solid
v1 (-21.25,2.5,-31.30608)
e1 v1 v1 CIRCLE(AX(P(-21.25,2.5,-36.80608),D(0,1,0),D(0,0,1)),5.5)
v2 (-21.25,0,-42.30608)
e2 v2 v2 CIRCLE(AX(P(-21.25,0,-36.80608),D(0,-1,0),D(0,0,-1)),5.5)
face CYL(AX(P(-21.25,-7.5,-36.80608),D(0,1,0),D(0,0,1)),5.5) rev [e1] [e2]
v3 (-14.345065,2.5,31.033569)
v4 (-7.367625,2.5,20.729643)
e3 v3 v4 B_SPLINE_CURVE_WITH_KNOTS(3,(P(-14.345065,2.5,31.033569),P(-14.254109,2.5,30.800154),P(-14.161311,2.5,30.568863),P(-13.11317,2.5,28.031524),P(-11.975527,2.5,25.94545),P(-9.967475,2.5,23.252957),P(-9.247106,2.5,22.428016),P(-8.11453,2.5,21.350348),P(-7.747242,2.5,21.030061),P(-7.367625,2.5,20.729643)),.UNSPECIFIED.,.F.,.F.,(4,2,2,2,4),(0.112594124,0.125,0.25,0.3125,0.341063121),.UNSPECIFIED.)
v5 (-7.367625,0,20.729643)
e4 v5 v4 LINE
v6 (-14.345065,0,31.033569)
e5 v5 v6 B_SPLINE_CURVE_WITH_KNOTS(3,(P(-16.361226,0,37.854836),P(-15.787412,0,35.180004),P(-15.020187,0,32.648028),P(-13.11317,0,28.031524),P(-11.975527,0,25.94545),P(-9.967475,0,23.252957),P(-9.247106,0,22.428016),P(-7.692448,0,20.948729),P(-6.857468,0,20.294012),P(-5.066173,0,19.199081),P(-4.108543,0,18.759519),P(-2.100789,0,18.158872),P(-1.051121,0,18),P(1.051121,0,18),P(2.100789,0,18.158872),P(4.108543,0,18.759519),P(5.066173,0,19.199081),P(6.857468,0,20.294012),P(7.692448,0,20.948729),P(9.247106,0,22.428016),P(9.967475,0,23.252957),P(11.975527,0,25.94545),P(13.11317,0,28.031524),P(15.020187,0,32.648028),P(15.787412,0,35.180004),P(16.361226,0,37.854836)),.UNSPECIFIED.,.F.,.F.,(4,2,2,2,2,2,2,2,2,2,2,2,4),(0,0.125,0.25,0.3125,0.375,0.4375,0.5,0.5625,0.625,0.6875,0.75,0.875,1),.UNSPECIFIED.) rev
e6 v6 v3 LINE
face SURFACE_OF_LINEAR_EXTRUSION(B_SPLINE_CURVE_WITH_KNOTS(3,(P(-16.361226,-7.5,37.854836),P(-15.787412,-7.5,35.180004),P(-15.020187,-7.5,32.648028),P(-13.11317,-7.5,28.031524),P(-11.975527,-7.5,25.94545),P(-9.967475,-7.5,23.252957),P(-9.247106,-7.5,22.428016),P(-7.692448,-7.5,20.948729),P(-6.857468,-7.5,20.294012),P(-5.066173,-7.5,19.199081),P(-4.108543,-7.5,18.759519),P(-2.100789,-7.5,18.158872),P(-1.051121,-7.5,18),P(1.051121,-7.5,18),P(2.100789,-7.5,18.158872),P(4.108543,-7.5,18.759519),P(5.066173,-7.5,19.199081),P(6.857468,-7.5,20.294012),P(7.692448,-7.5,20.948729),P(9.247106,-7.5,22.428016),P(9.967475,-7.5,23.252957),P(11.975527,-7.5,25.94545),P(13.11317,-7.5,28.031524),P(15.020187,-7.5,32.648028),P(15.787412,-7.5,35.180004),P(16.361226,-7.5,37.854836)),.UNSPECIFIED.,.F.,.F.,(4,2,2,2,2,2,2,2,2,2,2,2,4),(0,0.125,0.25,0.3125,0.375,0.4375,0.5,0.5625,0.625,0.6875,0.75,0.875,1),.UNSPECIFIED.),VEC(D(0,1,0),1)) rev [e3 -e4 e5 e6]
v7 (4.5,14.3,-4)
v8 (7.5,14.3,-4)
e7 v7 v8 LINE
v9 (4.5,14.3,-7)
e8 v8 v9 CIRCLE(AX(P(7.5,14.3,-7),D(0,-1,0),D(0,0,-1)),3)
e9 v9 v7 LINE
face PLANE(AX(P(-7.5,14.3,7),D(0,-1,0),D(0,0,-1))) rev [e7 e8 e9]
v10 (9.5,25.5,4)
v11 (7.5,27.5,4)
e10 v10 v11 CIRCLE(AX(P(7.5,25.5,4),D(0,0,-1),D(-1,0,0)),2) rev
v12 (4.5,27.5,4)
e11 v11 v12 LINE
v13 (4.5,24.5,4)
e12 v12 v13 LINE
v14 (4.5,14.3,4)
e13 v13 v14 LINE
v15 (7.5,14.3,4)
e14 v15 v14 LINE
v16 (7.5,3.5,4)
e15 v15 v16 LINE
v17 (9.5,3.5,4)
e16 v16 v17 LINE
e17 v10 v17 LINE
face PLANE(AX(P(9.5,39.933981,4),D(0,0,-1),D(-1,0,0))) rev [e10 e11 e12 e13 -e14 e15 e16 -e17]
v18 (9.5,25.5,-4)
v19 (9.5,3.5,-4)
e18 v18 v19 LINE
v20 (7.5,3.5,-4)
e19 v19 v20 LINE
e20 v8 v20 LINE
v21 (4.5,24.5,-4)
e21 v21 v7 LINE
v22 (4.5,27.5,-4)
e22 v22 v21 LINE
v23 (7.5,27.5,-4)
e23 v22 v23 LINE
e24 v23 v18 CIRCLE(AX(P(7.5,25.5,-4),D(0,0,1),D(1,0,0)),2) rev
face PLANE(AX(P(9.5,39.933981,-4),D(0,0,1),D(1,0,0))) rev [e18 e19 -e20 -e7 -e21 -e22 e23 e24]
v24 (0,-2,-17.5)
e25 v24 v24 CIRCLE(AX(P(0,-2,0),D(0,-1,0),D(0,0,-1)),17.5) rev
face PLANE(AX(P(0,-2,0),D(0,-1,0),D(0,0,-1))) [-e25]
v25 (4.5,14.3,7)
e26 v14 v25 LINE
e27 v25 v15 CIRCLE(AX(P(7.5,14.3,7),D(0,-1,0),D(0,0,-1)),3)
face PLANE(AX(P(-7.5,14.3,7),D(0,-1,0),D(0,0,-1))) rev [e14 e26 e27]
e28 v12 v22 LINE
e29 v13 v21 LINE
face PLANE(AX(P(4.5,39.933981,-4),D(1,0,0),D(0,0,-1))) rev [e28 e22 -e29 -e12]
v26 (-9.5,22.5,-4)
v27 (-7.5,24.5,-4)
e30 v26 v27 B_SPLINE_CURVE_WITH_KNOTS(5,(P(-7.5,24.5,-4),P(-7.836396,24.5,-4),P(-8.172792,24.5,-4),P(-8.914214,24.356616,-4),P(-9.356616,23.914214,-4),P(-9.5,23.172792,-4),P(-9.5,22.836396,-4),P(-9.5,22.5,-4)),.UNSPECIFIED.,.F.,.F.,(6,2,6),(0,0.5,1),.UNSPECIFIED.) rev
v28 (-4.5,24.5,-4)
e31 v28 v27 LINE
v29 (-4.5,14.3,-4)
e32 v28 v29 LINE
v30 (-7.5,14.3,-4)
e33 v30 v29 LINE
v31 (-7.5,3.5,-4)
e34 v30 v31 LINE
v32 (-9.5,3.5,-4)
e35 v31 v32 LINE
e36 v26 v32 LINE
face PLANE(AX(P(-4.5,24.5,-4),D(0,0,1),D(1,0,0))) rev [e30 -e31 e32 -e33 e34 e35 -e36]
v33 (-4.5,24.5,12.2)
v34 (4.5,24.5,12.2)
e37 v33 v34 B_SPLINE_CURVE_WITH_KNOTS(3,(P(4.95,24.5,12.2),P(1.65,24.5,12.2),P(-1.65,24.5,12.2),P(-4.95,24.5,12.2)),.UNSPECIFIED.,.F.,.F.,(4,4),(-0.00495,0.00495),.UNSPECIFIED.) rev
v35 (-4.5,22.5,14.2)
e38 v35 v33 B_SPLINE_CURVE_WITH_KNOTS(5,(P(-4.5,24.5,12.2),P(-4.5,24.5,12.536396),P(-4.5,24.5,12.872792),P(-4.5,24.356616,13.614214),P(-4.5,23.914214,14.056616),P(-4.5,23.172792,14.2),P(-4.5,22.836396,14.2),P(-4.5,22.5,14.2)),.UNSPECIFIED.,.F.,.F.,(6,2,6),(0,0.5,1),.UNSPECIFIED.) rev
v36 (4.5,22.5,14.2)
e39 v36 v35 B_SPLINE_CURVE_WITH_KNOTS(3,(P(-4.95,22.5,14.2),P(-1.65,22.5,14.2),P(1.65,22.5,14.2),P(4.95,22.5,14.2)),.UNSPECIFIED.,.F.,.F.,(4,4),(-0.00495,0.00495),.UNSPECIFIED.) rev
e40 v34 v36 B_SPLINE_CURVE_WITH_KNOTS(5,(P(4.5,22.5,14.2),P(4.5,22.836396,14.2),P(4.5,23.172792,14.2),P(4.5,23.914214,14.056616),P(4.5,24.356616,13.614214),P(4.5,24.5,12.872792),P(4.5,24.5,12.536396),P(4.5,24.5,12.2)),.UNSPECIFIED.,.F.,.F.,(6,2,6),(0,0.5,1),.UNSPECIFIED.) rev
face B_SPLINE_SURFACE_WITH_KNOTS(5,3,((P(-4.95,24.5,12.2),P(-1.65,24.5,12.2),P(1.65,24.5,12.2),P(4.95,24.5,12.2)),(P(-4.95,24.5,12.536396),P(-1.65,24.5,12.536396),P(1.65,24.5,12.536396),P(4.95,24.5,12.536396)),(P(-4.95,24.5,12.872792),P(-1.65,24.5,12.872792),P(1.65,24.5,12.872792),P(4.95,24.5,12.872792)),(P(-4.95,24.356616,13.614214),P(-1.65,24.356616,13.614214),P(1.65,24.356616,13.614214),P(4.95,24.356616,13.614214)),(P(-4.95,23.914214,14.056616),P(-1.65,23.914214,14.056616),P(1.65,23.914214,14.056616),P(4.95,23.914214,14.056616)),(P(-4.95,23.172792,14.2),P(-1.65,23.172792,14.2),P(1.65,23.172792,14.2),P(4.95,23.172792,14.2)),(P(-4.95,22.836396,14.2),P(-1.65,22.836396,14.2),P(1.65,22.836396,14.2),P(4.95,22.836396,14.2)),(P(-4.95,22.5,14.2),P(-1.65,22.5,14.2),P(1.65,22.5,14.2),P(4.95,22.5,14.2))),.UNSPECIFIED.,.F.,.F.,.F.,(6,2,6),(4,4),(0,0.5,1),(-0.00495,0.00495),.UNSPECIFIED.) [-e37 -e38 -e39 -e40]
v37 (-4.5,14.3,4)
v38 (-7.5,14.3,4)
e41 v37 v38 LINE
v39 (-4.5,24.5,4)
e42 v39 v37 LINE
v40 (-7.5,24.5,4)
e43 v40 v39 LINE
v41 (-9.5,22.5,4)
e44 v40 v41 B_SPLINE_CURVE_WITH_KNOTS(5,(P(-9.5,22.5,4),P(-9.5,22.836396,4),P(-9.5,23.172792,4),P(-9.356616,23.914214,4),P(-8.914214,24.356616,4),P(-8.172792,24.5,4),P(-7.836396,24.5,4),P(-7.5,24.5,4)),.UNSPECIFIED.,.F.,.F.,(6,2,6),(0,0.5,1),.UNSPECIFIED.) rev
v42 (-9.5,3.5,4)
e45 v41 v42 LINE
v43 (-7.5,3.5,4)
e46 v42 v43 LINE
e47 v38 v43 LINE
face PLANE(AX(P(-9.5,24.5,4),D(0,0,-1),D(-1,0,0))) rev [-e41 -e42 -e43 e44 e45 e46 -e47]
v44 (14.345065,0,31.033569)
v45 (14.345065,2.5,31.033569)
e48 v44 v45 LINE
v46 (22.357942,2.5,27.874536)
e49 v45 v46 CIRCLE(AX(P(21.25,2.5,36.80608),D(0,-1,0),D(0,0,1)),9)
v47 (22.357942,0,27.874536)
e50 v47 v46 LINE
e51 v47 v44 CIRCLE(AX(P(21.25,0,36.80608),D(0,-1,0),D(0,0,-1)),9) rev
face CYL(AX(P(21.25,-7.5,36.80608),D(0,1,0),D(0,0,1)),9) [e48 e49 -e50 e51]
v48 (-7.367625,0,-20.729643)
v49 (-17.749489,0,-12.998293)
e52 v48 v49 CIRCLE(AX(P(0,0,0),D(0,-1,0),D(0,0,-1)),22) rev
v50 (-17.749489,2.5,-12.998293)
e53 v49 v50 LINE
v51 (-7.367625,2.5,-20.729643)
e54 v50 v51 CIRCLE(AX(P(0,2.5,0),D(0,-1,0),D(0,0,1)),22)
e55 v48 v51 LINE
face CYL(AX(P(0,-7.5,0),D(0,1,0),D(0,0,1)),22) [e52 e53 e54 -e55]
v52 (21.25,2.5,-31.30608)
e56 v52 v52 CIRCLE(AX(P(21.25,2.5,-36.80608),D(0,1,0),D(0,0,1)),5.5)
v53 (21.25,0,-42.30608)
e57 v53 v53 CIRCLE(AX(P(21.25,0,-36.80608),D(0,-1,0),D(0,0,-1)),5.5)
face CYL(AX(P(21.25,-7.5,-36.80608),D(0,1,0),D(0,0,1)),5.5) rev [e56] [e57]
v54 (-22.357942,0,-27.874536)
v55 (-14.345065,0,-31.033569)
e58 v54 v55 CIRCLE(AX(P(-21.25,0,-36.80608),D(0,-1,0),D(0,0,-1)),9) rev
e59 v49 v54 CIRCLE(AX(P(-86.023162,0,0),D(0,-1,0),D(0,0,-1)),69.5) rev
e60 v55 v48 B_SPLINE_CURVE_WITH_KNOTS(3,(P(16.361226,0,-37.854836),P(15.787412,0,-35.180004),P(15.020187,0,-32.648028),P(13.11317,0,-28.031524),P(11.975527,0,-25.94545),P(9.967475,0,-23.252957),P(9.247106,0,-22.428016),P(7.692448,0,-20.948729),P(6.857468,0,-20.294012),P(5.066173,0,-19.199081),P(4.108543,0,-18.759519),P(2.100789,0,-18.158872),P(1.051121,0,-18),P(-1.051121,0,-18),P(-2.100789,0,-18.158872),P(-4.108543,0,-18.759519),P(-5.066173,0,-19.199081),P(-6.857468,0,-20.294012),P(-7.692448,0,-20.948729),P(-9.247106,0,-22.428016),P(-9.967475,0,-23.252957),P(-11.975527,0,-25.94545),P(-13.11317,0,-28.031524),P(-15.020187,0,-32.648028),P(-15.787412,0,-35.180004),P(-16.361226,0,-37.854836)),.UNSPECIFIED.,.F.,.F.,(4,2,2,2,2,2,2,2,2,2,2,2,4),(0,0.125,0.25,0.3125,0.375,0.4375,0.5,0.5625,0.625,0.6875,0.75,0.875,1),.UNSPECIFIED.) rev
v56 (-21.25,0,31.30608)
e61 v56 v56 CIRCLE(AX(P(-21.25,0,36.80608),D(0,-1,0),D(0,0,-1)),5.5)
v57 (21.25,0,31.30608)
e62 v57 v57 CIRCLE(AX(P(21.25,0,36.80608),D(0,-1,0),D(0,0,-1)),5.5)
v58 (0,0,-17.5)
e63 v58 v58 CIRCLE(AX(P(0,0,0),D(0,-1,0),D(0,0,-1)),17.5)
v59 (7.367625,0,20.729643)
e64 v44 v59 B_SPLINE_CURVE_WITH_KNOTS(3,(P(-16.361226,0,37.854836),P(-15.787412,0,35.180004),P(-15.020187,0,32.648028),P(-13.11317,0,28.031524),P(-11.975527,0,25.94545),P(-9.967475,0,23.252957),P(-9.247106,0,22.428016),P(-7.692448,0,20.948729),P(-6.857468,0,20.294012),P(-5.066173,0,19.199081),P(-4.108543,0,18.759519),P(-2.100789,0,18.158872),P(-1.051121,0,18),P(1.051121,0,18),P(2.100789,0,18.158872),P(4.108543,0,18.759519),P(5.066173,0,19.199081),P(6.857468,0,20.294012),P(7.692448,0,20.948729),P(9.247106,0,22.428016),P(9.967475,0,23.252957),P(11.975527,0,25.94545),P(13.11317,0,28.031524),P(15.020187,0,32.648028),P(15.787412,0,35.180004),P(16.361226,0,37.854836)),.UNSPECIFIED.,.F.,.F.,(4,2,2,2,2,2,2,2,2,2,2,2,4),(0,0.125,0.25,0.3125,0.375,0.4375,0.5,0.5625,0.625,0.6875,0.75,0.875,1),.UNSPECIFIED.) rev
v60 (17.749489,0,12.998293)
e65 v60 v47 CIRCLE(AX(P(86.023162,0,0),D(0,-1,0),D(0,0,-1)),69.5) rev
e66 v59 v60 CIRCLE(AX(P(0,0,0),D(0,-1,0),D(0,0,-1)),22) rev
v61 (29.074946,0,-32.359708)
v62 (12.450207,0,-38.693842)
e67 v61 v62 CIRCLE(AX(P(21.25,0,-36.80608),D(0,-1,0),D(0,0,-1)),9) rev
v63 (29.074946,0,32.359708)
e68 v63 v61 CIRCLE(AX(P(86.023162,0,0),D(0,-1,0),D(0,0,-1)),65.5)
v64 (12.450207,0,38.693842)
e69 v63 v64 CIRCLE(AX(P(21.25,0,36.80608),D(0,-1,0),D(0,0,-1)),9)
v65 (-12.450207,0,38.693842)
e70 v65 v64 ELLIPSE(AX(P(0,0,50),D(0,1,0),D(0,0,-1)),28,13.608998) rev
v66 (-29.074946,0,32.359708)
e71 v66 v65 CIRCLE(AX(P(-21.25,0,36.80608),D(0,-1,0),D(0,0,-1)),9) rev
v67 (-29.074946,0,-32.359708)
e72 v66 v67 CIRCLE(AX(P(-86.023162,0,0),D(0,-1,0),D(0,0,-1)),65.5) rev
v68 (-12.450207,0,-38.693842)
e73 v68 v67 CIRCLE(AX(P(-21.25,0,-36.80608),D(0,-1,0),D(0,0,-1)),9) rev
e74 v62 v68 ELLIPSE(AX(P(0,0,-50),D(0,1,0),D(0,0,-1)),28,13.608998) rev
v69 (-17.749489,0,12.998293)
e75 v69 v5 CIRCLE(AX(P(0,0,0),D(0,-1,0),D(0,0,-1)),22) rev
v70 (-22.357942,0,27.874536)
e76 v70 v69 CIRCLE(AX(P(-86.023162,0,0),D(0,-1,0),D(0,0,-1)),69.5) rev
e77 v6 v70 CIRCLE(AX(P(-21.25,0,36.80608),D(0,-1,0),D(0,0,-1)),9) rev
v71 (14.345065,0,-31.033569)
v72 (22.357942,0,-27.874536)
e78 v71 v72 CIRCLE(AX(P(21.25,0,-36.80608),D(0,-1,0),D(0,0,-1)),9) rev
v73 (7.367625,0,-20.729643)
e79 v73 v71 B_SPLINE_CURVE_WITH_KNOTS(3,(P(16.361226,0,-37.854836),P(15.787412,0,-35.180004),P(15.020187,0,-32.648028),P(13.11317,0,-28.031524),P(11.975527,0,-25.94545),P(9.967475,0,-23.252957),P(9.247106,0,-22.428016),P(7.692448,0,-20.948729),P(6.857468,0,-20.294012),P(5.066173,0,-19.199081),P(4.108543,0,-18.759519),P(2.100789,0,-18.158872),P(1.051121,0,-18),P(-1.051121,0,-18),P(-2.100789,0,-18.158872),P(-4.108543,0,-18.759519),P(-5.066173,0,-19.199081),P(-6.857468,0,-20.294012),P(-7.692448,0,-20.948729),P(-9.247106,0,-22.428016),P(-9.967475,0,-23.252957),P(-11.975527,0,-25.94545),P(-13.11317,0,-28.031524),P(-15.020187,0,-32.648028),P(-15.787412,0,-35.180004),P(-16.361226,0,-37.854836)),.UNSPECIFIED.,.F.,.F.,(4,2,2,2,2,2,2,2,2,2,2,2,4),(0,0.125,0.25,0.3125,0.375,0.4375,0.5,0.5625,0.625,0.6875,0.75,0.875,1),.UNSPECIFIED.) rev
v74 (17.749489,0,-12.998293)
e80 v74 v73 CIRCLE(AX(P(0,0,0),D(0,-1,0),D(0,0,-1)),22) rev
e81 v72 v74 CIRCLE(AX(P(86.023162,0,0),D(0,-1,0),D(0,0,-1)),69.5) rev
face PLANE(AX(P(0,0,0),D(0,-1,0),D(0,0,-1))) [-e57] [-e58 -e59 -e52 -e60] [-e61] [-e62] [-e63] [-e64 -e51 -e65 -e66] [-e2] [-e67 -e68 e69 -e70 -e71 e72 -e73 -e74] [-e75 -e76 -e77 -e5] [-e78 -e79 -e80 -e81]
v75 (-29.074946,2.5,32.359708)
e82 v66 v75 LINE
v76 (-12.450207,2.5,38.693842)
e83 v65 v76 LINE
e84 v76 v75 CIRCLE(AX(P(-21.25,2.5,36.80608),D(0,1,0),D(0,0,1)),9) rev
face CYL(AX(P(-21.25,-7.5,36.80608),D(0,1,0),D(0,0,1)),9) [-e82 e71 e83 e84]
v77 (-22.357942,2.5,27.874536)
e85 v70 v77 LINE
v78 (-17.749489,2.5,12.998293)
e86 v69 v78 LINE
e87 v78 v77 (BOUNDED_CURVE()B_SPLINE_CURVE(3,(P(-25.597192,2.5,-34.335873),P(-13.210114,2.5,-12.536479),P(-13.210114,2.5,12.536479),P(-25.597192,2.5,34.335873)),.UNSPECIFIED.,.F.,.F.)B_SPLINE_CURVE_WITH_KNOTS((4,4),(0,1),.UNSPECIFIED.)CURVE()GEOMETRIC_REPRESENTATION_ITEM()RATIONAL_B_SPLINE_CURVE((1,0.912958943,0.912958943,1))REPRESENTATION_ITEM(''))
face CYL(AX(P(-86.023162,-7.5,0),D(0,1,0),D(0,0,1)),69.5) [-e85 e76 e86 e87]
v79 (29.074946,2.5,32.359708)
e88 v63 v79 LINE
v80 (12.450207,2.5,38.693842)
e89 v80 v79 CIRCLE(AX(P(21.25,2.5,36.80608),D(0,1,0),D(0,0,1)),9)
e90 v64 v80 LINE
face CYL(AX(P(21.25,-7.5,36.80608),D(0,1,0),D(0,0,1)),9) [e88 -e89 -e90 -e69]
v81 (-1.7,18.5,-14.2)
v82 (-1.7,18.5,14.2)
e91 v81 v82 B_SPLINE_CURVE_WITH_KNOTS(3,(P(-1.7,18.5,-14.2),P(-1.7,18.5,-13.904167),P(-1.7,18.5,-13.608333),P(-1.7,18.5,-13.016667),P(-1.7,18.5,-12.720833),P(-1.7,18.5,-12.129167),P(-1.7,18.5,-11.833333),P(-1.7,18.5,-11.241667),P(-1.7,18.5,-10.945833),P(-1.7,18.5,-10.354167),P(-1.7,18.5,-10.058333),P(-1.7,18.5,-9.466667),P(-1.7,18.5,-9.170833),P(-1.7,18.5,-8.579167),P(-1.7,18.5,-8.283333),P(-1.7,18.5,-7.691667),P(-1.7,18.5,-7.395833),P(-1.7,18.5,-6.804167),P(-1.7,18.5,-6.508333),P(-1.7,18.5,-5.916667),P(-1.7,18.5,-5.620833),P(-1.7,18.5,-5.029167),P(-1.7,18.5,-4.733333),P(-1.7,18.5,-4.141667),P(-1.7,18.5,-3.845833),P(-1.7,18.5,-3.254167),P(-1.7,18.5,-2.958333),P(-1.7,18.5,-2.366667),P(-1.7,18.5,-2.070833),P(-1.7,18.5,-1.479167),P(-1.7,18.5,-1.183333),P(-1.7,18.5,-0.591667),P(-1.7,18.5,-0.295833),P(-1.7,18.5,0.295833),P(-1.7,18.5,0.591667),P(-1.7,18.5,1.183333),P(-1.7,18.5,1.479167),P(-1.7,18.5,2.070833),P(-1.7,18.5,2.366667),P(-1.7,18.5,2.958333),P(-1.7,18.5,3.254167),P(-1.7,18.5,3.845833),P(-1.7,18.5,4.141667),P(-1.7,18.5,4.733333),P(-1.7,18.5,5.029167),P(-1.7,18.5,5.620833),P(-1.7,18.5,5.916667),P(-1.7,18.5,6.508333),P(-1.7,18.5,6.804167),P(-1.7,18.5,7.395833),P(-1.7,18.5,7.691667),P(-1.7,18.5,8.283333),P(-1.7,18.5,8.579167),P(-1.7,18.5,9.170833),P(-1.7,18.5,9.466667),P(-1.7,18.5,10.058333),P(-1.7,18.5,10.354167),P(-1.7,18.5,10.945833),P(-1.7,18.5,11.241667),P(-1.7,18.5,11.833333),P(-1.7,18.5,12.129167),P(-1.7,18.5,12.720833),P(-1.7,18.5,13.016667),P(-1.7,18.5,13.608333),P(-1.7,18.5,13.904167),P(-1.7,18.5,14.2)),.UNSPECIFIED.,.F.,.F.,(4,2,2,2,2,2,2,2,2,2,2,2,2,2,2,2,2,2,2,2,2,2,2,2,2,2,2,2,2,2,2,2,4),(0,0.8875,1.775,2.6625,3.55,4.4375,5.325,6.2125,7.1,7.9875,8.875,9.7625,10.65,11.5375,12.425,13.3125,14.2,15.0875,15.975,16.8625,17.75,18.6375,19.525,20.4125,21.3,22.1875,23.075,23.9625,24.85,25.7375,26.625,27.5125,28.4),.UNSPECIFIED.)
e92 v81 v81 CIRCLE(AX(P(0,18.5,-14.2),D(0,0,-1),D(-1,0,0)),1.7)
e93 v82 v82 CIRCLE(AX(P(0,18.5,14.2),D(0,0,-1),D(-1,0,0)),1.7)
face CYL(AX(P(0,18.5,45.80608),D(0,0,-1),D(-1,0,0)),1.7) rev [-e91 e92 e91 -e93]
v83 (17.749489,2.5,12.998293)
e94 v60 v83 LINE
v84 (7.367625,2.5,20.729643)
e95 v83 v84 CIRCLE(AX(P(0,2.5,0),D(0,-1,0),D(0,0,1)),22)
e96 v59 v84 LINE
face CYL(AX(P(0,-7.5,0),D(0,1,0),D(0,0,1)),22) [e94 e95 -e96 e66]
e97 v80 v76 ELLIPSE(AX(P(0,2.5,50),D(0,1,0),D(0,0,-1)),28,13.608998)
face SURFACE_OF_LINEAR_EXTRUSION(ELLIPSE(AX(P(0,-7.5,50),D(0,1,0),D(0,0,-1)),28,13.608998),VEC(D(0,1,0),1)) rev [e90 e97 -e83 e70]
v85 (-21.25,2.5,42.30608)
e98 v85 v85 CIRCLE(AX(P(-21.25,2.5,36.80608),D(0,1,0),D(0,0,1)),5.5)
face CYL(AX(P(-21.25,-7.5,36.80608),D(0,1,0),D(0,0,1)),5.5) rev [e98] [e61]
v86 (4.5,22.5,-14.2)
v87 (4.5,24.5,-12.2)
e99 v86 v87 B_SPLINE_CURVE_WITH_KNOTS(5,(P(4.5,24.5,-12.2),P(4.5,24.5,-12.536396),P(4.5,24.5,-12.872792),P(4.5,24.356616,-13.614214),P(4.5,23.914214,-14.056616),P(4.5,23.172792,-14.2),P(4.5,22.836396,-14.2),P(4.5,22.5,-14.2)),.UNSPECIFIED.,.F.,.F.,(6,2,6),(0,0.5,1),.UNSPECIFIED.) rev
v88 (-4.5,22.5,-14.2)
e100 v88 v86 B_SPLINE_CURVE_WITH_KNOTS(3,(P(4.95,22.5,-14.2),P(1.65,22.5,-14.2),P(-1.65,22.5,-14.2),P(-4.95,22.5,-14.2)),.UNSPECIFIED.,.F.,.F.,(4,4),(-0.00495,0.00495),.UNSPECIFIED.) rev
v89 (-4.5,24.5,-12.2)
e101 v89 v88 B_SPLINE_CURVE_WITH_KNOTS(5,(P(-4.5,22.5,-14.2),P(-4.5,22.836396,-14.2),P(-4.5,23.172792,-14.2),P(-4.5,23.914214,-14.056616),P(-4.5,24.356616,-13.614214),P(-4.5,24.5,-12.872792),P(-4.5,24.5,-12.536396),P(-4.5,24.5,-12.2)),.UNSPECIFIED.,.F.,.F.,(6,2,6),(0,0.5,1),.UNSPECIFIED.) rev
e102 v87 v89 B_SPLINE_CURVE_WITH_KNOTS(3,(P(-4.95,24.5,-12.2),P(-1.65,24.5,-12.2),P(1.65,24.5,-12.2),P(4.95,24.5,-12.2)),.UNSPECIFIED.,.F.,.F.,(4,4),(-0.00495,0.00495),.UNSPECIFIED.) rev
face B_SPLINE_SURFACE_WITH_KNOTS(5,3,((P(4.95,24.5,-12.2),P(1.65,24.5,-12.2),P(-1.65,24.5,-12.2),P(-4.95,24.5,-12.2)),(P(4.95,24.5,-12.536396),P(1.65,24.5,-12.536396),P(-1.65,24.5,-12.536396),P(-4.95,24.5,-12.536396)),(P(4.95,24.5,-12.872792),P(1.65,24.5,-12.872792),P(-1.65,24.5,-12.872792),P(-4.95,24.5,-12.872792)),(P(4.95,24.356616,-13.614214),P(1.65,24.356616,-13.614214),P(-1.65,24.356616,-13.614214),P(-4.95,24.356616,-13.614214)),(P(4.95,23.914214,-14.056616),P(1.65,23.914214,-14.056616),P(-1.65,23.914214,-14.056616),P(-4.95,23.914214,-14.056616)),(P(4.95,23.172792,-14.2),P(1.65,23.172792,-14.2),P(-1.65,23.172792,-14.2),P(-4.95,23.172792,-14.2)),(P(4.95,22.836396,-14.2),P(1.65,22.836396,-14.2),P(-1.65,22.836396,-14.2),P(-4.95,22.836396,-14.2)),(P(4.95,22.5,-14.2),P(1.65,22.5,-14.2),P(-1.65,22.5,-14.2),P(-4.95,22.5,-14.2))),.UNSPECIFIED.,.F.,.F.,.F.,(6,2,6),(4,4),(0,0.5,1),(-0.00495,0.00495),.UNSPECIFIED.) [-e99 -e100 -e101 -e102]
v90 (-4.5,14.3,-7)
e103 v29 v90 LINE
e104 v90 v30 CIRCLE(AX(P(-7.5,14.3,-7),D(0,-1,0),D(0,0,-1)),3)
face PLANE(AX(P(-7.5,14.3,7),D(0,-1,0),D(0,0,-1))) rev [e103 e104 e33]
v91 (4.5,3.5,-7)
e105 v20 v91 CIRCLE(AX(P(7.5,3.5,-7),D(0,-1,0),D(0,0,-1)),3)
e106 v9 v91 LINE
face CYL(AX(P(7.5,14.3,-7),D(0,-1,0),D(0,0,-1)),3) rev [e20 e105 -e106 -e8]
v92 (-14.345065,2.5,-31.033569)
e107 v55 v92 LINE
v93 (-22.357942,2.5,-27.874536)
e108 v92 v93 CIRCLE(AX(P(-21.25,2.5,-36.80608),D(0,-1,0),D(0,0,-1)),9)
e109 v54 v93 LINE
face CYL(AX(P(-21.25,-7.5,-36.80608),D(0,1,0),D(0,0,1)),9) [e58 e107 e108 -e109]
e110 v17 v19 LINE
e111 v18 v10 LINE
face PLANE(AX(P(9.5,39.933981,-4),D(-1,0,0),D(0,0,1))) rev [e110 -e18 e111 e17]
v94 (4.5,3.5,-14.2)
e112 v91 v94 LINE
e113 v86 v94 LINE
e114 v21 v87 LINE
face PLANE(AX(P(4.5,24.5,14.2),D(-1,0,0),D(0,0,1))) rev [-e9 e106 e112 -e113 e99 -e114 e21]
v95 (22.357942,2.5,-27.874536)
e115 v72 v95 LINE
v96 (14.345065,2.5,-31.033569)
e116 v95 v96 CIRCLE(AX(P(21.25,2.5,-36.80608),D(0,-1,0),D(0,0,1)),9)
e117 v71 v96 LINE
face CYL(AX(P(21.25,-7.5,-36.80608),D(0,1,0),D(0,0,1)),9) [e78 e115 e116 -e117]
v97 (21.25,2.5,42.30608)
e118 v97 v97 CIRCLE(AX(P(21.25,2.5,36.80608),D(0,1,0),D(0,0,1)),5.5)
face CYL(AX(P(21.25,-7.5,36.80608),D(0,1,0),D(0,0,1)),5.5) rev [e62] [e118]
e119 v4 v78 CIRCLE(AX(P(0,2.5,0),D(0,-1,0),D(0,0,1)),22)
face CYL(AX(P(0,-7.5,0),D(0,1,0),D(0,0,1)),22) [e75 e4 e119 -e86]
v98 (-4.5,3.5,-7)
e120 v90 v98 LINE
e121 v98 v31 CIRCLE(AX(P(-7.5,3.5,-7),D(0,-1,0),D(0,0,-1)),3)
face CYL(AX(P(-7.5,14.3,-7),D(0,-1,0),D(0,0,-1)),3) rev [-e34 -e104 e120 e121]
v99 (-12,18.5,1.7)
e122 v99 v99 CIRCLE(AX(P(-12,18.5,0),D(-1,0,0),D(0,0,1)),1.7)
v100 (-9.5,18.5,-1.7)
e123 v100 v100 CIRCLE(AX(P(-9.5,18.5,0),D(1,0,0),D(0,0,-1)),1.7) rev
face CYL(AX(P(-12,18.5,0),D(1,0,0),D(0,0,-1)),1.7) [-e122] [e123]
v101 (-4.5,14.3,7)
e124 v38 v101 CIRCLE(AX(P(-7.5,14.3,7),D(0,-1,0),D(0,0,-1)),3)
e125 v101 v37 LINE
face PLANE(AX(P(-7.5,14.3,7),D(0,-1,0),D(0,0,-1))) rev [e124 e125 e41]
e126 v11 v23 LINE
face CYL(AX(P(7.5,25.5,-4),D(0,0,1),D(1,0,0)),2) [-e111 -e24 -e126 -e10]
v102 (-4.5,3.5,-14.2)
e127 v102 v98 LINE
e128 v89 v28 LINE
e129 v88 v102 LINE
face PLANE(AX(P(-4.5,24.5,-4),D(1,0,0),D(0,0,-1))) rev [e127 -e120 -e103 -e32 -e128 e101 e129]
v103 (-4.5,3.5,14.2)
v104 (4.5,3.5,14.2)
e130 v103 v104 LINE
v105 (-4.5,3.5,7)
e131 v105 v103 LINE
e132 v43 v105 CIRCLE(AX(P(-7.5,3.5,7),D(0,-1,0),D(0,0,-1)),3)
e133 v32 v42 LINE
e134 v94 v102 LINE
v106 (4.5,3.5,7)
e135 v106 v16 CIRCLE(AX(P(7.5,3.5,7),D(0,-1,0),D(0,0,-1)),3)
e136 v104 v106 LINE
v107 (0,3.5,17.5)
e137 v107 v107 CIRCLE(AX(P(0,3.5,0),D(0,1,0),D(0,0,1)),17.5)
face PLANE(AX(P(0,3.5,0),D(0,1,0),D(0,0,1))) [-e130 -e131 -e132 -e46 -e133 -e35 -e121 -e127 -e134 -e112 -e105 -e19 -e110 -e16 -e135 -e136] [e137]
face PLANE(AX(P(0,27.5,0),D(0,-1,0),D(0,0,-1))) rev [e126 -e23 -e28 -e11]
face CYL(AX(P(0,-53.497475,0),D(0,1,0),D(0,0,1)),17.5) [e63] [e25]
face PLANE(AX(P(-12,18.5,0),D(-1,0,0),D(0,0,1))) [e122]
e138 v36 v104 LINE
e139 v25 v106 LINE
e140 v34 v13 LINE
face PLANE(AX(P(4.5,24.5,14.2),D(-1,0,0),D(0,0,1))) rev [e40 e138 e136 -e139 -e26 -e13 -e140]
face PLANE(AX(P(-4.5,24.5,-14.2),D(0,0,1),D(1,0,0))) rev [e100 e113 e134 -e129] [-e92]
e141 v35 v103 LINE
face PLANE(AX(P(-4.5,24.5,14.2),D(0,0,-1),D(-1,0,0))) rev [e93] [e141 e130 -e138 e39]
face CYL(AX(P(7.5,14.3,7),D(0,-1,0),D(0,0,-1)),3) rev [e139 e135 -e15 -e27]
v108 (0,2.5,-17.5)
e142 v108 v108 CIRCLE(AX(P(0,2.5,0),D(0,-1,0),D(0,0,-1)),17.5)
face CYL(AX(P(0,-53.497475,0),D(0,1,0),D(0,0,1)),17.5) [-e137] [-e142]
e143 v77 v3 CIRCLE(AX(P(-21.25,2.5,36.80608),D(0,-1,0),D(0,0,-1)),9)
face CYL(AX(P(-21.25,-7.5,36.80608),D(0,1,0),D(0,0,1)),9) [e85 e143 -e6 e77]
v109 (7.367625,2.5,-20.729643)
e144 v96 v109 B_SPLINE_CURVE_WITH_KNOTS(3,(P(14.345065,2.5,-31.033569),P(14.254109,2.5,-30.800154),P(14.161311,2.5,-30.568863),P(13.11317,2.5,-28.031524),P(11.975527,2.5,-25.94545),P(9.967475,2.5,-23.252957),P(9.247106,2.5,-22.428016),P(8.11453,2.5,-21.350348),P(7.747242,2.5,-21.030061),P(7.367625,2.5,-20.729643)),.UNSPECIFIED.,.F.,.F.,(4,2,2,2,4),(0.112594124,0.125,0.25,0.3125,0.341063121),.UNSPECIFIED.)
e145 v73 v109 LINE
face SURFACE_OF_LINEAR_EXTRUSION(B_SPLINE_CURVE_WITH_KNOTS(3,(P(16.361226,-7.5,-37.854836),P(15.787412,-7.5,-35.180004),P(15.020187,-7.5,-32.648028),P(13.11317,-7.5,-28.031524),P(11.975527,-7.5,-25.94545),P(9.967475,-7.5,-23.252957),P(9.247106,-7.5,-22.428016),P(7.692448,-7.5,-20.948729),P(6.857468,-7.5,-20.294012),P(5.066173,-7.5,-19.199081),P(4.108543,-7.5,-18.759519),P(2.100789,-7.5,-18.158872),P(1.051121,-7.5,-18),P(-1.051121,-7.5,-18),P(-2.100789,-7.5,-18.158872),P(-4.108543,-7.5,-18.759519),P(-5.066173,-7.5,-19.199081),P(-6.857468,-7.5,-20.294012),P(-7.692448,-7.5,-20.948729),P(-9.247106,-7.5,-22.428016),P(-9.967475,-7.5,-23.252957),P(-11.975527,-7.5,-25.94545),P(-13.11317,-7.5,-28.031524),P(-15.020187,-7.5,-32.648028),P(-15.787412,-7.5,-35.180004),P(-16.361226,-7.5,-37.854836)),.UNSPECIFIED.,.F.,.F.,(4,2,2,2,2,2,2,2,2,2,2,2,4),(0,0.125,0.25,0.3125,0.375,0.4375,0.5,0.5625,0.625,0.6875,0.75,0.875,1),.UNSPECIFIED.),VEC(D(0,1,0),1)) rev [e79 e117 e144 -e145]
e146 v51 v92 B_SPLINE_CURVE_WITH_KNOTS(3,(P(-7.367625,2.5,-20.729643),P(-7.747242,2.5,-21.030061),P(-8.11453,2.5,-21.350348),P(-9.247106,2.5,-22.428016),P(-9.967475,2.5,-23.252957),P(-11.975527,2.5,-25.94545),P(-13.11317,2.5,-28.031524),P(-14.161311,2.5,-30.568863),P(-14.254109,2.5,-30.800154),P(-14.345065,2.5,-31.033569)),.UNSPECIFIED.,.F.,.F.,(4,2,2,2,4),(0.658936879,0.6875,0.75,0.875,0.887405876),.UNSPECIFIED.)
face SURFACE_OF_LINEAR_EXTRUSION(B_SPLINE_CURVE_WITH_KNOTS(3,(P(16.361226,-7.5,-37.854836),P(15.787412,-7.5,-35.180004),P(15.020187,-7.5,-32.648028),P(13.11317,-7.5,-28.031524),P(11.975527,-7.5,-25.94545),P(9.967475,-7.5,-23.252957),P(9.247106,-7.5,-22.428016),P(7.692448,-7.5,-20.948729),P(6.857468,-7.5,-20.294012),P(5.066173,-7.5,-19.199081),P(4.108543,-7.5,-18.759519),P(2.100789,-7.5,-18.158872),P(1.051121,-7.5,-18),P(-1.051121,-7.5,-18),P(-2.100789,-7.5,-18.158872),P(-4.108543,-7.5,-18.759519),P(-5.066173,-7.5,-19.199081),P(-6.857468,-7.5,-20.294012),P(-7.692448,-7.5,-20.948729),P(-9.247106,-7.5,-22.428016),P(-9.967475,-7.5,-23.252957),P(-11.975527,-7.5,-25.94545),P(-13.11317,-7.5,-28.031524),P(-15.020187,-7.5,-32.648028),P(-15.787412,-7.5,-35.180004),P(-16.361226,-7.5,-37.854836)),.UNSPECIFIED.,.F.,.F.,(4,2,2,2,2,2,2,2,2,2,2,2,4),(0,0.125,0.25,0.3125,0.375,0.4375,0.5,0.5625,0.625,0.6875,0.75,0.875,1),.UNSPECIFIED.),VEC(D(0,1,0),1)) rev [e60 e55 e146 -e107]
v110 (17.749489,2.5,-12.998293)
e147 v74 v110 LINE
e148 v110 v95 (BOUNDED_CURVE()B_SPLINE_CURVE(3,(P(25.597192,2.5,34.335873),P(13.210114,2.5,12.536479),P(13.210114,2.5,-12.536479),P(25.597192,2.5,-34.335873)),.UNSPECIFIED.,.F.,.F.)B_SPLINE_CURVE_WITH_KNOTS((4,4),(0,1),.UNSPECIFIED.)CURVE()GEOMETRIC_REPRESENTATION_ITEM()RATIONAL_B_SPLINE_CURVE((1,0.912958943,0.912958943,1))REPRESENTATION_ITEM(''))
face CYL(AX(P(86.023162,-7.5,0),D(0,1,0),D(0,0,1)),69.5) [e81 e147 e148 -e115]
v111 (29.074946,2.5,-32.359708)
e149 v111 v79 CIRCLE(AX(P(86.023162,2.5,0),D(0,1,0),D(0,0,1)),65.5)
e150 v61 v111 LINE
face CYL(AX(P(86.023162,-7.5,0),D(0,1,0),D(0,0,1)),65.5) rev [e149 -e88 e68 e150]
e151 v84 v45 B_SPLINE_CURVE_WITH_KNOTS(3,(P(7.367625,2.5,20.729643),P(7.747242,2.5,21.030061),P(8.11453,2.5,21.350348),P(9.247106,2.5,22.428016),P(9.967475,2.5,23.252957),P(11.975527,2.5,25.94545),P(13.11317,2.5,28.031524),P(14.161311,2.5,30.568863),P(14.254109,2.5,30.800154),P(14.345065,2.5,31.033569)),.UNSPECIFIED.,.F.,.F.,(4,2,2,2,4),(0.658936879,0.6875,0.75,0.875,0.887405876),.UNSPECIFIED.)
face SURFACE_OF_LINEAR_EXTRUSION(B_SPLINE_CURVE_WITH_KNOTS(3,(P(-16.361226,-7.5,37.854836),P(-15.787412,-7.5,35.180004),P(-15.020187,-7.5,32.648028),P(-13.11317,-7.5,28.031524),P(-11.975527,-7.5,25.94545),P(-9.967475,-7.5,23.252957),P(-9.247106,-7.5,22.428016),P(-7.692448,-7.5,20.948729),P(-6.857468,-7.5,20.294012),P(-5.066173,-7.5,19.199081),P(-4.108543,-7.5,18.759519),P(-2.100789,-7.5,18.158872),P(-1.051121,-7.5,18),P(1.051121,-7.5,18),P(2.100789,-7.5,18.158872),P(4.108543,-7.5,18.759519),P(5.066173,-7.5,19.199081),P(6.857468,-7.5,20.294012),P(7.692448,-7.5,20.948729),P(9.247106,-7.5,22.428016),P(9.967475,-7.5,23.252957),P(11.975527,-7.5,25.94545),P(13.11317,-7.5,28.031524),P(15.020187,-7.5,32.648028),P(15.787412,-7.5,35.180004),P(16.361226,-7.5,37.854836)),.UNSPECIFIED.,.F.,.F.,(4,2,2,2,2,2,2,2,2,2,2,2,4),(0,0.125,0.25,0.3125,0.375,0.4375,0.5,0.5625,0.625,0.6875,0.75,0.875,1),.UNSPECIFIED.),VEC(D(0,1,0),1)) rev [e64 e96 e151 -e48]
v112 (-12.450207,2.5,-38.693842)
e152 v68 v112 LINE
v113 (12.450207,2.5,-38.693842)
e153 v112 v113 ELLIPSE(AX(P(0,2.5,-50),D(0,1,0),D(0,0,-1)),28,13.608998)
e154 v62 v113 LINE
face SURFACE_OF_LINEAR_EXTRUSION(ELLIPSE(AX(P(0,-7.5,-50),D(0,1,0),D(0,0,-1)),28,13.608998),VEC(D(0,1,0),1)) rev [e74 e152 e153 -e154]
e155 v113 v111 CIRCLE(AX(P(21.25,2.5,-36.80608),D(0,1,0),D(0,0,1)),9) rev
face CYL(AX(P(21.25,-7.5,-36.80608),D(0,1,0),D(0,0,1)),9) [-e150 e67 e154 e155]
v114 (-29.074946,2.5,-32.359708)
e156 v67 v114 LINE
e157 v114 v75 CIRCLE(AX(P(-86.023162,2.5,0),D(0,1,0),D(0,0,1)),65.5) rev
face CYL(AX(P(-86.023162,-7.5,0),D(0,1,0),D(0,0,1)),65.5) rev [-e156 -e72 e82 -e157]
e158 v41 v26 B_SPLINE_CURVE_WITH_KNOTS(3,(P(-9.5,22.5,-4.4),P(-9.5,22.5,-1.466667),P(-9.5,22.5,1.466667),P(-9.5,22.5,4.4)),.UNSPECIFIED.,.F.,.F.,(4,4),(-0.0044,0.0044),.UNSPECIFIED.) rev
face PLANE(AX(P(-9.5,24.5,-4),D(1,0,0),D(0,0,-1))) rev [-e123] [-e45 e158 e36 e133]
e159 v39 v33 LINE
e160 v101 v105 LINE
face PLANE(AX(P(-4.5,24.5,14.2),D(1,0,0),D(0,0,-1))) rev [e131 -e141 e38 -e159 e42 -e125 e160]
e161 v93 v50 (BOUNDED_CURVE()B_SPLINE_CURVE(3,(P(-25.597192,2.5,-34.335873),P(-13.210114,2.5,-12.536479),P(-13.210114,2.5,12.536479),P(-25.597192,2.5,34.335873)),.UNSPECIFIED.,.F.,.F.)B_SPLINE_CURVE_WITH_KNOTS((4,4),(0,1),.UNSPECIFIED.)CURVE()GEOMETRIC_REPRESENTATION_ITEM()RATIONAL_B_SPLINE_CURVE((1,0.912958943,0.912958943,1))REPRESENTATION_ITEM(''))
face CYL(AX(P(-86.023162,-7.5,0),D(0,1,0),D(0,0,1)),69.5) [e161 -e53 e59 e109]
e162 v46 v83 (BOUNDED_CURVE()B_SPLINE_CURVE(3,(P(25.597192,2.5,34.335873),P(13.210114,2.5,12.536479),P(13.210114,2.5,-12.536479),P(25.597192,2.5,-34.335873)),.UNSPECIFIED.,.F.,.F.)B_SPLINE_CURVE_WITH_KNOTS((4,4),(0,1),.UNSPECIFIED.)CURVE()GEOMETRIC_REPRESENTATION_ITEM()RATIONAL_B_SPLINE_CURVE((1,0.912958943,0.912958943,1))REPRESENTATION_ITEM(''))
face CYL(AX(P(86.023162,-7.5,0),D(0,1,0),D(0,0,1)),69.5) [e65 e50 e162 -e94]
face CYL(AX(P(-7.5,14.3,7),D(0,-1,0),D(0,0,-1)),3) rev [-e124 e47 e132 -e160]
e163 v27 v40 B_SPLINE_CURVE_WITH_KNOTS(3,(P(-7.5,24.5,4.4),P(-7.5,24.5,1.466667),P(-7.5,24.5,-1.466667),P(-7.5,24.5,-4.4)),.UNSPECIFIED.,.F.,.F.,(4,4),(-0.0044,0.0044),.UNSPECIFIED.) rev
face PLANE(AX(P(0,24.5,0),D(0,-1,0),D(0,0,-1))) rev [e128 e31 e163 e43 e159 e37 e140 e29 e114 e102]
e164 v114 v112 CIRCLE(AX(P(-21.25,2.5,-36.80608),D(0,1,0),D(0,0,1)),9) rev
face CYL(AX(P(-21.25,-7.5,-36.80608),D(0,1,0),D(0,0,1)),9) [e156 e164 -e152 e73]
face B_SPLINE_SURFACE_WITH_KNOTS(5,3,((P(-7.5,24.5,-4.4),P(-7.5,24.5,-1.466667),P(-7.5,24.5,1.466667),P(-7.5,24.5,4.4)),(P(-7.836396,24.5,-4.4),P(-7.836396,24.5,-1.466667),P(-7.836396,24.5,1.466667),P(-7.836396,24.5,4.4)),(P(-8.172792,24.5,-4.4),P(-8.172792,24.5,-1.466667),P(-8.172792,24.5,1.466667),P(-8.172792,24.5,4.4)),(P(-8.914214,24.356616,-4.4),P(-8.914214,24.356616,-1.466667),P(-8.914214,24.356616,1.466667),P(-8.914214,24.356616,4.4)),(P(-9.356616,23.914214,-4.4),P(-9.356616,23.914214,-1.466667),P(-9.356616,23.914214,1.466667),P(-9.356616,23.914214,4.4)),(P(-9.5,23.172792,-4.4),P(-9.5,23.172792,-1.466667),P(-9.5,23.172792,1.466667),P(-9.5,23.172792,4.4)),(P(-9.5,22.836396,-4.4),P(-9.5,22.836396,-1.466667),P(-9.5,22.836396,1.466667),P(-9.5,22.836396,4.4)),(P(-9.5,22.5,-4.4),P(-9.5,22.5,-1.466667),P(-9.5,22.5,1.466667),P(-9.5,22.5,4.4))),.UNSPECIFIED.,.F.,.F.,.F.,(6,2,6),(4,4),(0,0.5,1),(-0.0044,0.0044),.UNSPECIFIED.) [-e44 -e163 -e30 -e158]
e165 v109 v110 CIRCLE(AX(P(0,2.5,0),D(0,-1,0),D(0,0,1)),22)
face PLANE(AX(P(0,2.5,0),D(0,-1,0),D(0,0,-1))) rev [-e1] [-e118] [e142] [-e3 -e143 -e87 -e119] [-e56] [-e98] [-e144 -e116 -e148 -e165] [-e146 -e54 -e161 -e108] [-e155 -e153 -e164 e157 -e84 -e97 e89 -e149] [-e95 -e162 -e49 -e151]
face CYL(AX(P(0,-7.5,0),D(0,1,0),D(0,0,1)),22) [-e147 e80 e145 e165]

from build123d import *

# Parameters (mm, degrees)
SKETCH1_W                = 100
SKETCH1_H                = 100
BOSS_EXTRUDE1_DEPTH      = 2.5
SKETCH2_W                = 100
SKETCH2_H                = 100
SKETCH2_R                = 5.5
CUT_EXTRUDE1_DEPTH       = 10
CUT_EXTRUDE3_DEPTH       = 10
BOSS_EXTRUDE2_DEPTH      = 1
BOSS_EXTRUDE2_DEPTH_BACK = 4.5
SKETCH6_R                = 17.5
BOSS_EXTRUDE6_DEPTH      = 21
FILLET1_SIZE             = 2
FILLET2_SIZE             = 2
SKETCH12_R               = 1.7
CUT_EXTRUDE4_DEPTH       = 72.5265134
SKETCH13_R               = 1.7
BOSS_EXTRUDE8_DEPTH      = 2.5
SKETCH16_W               = 5
SKETCH16_H               = 8
BOSS_EXTRUDE9_DEPTH      = 24
FILLET3_R                = 2
BOSS_EXTRUDE10_DEPTH     = 10.8


with BuildPart() as part:
    # Sketch1 → Boss-Extrude1 (new body)
    with BuildSketch(Plane(origin=(0, 0, 0), x_dir=(1, 0, 0), z_dir=(0, 1, 0))):
        Rectangle(SKETCH1_W, SKETCH1_H)
    extrude(amount=BOSS_EXTRUDE1_DEPTH)

    # Sketch2 → Cut-Extrude1 (cut)
    # profile 1 of 5: a face of its own
    with BuildSketch(Plane(origin=(0, 2.5, 0), x_dir=(1, 0, 0), z_dir=(0, 1, 0))):
        Rectangle(SKETCH2_W, SKETCH2_H)
        with BuildLine():
            ThreePointArc((-29.074945731, -32.359707621), (-20.523161881, 0), (-29.074945731, 32.359707621))
            ThreePointArc((-29.074945731, 32.359707621), (-24.454355603, 45.216317777), (-12.450207096, 38.693841525))
            add(Edge.make_bspline(
                [(-12.450207096, 38.693841525), (0, -19.342739332), (12.450207096, 38.693841525)],
                knots=[5.128046308, 5.128046308, 5.128046308, 7.438324307, 7.438324307, 7.438324307], degree=2, weights=[1, 0.403791374, 1]))
            ThreePointArc((12.450207096, 38.693841525), (24.454355603, 45.216317777), (29.074945731, 32.359707621))
            ThreePointArc((29.074945731, 32.359707621), (20.523161881, 0), (29.074945731, -32.359707621))
            ThreePointArc((29.074945731, -32.359707621), (24.454355603, -45.216317777), (12.450207096, -38.693841525))
            add(Edge.make_bspline(
                [(12.450207096, -38.693841525), (0, 19.342739332), (-12.450207096, -38.693841525)],
                knots=[5.128046308, 5.128046308, 5.128046308, 7.438324307, 7.438324307, 7.438324307], degree=2, weights=[1, 0.403791374, 1]))
            ThreePointArc((-12.450207096, -38.693841525), (-24.454355603, -45.216317777), (-29.074945731, -32.359707621))
        make_face(mode=Mode.SUBTRACT)
    # profile 2 of 5: a face of its own
    with BuildSketch(Plane(origin=(0, 2.5, 0), x_dir=(1, 0, 0), z_dir=(0, 1, 0))):
        with Locations(Location((-21.25, 36.806079661, 0), (0, 0, 270))):
            Circle(SKETCH2_R)
    # profile 3 of 5: a face of its own
    with BuildSketch(Plane(origin=(0, 2.5, 0), x_dir=(1, 0, 0), z_dir=(0, 1, 0))):
        with Locations(Location((-21.25, -36.806079661, 0), (0, 0, 270))):
            Circle(SKETCH2_R)
    # profile 4 of 5: a face of its own
    with BuildSketch(Plane(origin=(0, 2.5, 0), x_dir=(1, 0, 0), z_dir=(0, 1, 0))):
        with Locations(Location((21.25, -36.806079661, 0), (0, 0, 270))):
            Circle(SKETCH2_R)
    # profile 5 of 5: a face of its own
    with BuildSketch(Plane(origin=(0, 2.5, 0), x_dir=(1, 0, 0), z_dir=(0, 1, 0))):
        with Locations(Location((21.25, 36.806079661, 0), (0, 0, 270))):
            Circle(SKETCH2_R)
    extrude(amount=-CUT_EXTRUDE1_DEPTH, mode=Mode.SUBTRACT)

    # Sketch4 → Cut-Extrude3 (cut)
    with BuildSketch(Plane(origin=(0, 2.5, 0), x_dir=(1, 0, 0), z_dir=(0, 1, 0))):
        with BuildLine():
            ThreePointArc((-17.749489284, -12.998293356), (-13.140045691, -17.64480658), (-7.367625104, -20.729643034))
            add(Edge.make_bspline(
                [(-7.367625104, -20.729643034), (-7.747241798, -21.030061446), (-8.114529726, -21.350348356), (-9.247106431, -22.428016295), (-9.96747496, -23.25295704), (-11.975526868, -25.945450431), (-13.113170007, -28.031524091), (-14.161311212, -30.568863064), (-14.254109179, -30.800153833), (-14.345065296, -31.033569225)],
                knots=[0.658936879, 0.658936879, 0.658936879, 0.658936879, 0.6875, 0.6875, 0.75, 0.75, 0.875, 0.875, 0.887405876, 0.887405876, 0.887405876, 0.887405876], degree=3))
            ThreePointArc((-14.345065296, -31.033569225), (-17.949067849, -28.433275654), (-22.357942029, -27.874536431))
            add(Edge.make_bspline(
                [(-17.749489284, -12.998293356), (-18.730013182, -18.148505445), (-20.279042278, -23.126345909), (-22.357942029, -27.874536431)],
                knots=[0.6784999, 0.6784999, 0.6784999, 0.6784999, 0.896036051, 0.896036051, 0.896036051, 0.896036051], degree=3, weights=[0.94303917, 0.94979881, 0.960677405, 0.975674954]))
        make_face()
        with BuildLine():
            ThreePointArc((7.367625104, -20.729643034), (13.140045691, -17.64480658), (17.749489284, -12.998293356))
            add(Edge.make_bspline(
                [(22.357942029, -27.874536431), (20.279042278, -23.126345909), (18.730013182, -18.148505445), (17.749489284, -12.998293356)],
                knots=[0.103963949, 0.103963949, 0.103963949, 0.103963949, 0.3215001, 0.3215001, 0.3215001, 0.3215001], degree=3, weights=[0.975674954, 0.960677405, 0.94979881, 0.94303917]))
            ThreePointArc((22.357942029, -27.874536431), (17.949067849, -28.433275654), (14.345065296, -31.033569225))
            add(Edge.make_bspline(
                [(14.345065296, -31.033569225), (14.254109179, -30.800153832), (14.161311212, -30.568863064), (13.113170007, -28.031524091), (11.975526868, -25.945450431), (9.96747496, -23.25295704), (9.247106431, -22.428016295), (8.114529726, -21.350348356), (7.747241798, -21.030061447), (7.367625104, -20.729643034)],
                knots=[0.112594124, 0.112594124, 0.112594124, 0.112594124, 0.125, 0.125, 0.25, 0.25, 0.3125, 0.3125, 0.341063121, 0.341063121, 0.341063121, 0.341063121], degree=3))
        make_face()
        with BuildLine():
            ThreePointArc((14.345065296, 31.033569225), (17.949067849, 28.433275654), (22.357942029, 27.874536431))
            add(Edge.make_bspline(
                [(17.749489284, 12.998293356), (18.730013182, 18.148505445), (20.279042278, 23.126345909), (22.357942029, 27.874536431)],
                knots=[0.6784999, 0.6784999, 0.6784999, 0.6784999, 0.896036051, 0.896036051, 0.896036051, 0.896036051], degree=3, weights=[0.94303917, 0.94979881, 0.960677405, 0.975674954]))
            ThreePointArc((17.749489284, 12.998293356), (13.140045691, 17.64480658), (7.367625104, 20.729643034))
            add(Edge.make_bspline(
                [(7.367625104, 20.729643034), (7.747241798, 21.030061446), (8.114529726, 21.350348356), (9.247106431, 22.428016295), (9.96747496, 23.25295704), (11.975526868, 25.945450431), (13.113170007, 28.031524091), (14.161311212, 30.568863064), (14.254109179, 30.800153833), (14.345065296, 31.033569225)],
                knots=[0.658936879, 0.658936879, 0.658936879, 0.658936879, 0.6875, 0.6875, 0.75, 0.75, 0.875, 0.875, 0.887405876, 0.887405876, 0.887405876, 0.887405876], degree=3))
        make_face()
        with BuildLine():
            ThreePointArc((-14.345065296, 31.033569225), (-17.949067849, 28.433275654), (-22.357942029, 27.874536431))
            add(Edge.make_bspline(
                [(-22.357942029, 27.874536431), (-20.279042278, 23.126345909), (-18.730013182, 18.148505445), (-17.749489284, 12.998293356)],
                knots=[0.103963949, 0.103963949, 0.103963949, 0.103963949, 0.3215001, 0.3215001, 0.3215001, 0.3215001], degree=3, weights=[0.975674954, 0.960677405, 0.94979881, 0.94303917]))
            ThreePointArc((-17.749489284, 12.998293356), (-13.140045691, 17.64480658), (-7.367625104, 20.729643034))
            add(Edge.make_bspline(
                [(-14.345065296, 31.033569225), (-14.254109179, 30.800153832), (-14.161311212, 30.568863064), (-13.113170007, 28.031524091), (-11.975526868, 25.945450431), (-9.96747496, 23.25295704), (-9.247106431, 22.428016295), (-8.114529726, 21.350348356), (-7.747241798, 21.030061447), (-7.367625104, 20.729643034)],
                knots=[0.112594124, 0.112594124, 0.112594124, 0.112594124, 0.125, 0.125, 0.25, 0.25, 0.3125, 0.3125, 0.341063121, 0.341063121, 0.341063121, 0.341063121], degree=3))
        make_face()
    extrude(amount=-CUT_EXTRUDE3_DEPTH, mode=Mode.SUBTRACT)

    # Sketch6 → Boss-Extrude2 (add, two sides: drawn at the far end of the back side and taken through both)
    with BuildSketch(Plane(origin=(0, 2.5, 0), x_dir=(1, 0, 0), z_dir=(0, 1, 0)).offset(-BOSS_EXTRUDE2_DEPTH_BACK)):
        with Locations(Location((0, 0, 0), (0, 0, 270))):
            Circle(SKETCH6_R)
    extrude(amount=BOSS_EXTRUDE2_DEPTH + BOSS_EXTRUDE2_DEPTH_BACK)

    # Sketch9 → Boss-Extrude6 (add)
    with BuildSketch(Plane(origin=(0, 3.5, 0), x_dir=(1, 0, 0), z_dir=(0, 1, 0))):
        Polygon((-4.5, 4), (-9.5, 4), (-9.5, -4), (-4.5, -4), (-4.5, -14.2), (4.5, -14.2), (4.5, 14.2), (-4.5, 14.2), align=None)
    extrude(amount=BOSS_EXTRUDE6_DEPTH)

    # Fillet1
    # a fillet whose section is not a circle: 2 mm, written as the material it takes off along each edge
    with BuildSketch(Plane(origin=(-9.5, 24.5, -9), x_dir=(0, -1, 0), z_dir=(0, 0, 1))) as fillet1_piece_1:
        with BuildLine():
            add(Edge.make_bspline([(FILLET1_SIZE, 0), (FILLET1_SIZE * 0.831801948466, 0), (FILLET1_SIZE * 0.663603896932, 0), (FILLET1_SIZE * 0.292893218813, FILLET1_SIZE * 0.0716919198361), (FILLET1_SIZE * 0.0716919198361, FILLET1_SIZE * 0.292893218813), (0, FILLET1_SIZE * 0.663603896932), (0, FILLET1_SIZE * 0.831801948466), (0, FILLET1_SIZE)], knots=[0, 0, 0, 0, 0, 0, 0.5, 0.5, 1, 1, 1, 1, 1, 1], degree=5))
            Line((0, FILLET1_SIZE), (0, 0))
            Line((0, 0), (FILLET1_SIZE, 0))
        make_face()
    extrude(amount=18, mode=Mode.SUBTRACT)

    # Fillet2
    # a fillet whose section is not a circle: 2 mm, written as the material it takes off along each edge
    with BuildSketch(Plane(origin=(-9.5, 24.5, 14.2), x_dir=(0, -1, 0), z_dir=(1, 0, 0)), Plane(origin=(9.5, 24.5, -14.2), x_dir=(0, -1, 0), z_dir=(-1, 0, 0))) as fillet2_piece_1:
        with BuildLine():
            add(Edge.make_bspline([(FILLET2_SIZE, 0), (FILLET2_SIZE * 0.831801948466, 0), (FILLET2_SIZE * 0.663603896932, 0), (FILLET2_SIZE * 0.292893218813, FILLET2_SIZE * 0.0716919198361), (FILLET2_SIZE * 0.0716919198361, FILLET2_SIZE * 0.292893218813), (0, FILLET2_SIZE * 0.663603896932), (0, FILLET2_SIZE * 0.831801948466), (0, FILLET2_SIZE)], knots=[0, 0, 0, 0, 0, 0, 0.5, 0.5, 1, 1, 1, 1, 1, 1], degree=5))
            Line((0, FILLET2_SIZE), (0, 0))
            Line((0, 0), (FILLET2_SIZE, 0))
        make_face()
    extrude(amount=19, mode=Mode.SUBTRACT)

    # Sketch12 → Cut-Extrude4 (cut, through all)
    with BuildSketch(Plane(origin=(0, 0, -14.2), x_dir=(-1, 0, 0), z_dir=(0, 0, -1))):
        with Locations((0, 18.5)):
            Circle(SKETCH12_R)
    extrude(amount=-CUT_EXTRUDE4_DEPTH, mode=Mode.SUBTRACT)

    # Sketch13 → Boss-Extrude8 (add)
    with BuildSketch(Plane.ZY.offset(9.5)):
        with Locations(Location((0, 18.5, 0), (0, 0, 180))):
            Circle(SKETCH13_R)
    extrude(amount=BOSS_EXTRUDE8_DEPTH)

    # Sketch16 → Boss-Extrude9 (add)
    with BuildSketch(Plane(origin=(0, 3.5, 0), x_dir=(1, 0, 0), z_dir=(0, 1, 0))):
        with Locations((7, 0)):
            Rectangle(SKETCH16_W, SKETCH16_H)
    extrude(amount=BOSS_EXTRUDE9_DEPTH)

    # Fillet3
    fillet3_edges = [part.edges().sort_by_distance(p)[0] for p in [
        (9.5, 27.5, 0),
    ]]
    fillet(fillet3_edges, radius=FILLET3_R)

    # Sketch18 → Boss-Extrude10 (add)
    with BuildSketch(Plane(origin=(0, 3.5, 0), x_dir=(1, 0, 0), z_dir=(0, 1, 0))):
        with BuildLine():
            Line((-9.5, -4), (-7.5, -4))
            ThreePointArc((-7.5, -4), (-5.378679656, -4.878679656), (-4.5, -7))
            Line((-4.5, -7), (-4.5, -14.2))
            Line((-4.5, -14.2), (4.5, -14.2))
            Line((4.5, -14.2), (4.5, -7))
            ThreePointArc((4.5, -7), (5.378679656, -4.878679656), (7.5, -4))
            Line((7.5, -4), (9.5, -4))
            Line((9.5, -4), (9.5, 4))
            Line((9.5, 4), (7.5, 4))
            ThreePointArc((7.5, 4), (5.378679656, 4.878679656), (4.5, 7))
            Line((4.5, 7), (4.5, 14.2))
            Line((4.5, 14.2), (-4.5, 14.2))
            Line((-4.5, 14.2), (-4.5, 7))
            ThreePointArc((-4.5, 7), (-5.378679656, 4.878679656), (-7.5, 4))
            Line((-7.5, 4), (-9.5, 4))
            Line((-9.5, 4), (-9.5, -4))
        make_face()
    extrude(amount=BOSS_EXTRUDE10_DEPTH)


solid = part.part
